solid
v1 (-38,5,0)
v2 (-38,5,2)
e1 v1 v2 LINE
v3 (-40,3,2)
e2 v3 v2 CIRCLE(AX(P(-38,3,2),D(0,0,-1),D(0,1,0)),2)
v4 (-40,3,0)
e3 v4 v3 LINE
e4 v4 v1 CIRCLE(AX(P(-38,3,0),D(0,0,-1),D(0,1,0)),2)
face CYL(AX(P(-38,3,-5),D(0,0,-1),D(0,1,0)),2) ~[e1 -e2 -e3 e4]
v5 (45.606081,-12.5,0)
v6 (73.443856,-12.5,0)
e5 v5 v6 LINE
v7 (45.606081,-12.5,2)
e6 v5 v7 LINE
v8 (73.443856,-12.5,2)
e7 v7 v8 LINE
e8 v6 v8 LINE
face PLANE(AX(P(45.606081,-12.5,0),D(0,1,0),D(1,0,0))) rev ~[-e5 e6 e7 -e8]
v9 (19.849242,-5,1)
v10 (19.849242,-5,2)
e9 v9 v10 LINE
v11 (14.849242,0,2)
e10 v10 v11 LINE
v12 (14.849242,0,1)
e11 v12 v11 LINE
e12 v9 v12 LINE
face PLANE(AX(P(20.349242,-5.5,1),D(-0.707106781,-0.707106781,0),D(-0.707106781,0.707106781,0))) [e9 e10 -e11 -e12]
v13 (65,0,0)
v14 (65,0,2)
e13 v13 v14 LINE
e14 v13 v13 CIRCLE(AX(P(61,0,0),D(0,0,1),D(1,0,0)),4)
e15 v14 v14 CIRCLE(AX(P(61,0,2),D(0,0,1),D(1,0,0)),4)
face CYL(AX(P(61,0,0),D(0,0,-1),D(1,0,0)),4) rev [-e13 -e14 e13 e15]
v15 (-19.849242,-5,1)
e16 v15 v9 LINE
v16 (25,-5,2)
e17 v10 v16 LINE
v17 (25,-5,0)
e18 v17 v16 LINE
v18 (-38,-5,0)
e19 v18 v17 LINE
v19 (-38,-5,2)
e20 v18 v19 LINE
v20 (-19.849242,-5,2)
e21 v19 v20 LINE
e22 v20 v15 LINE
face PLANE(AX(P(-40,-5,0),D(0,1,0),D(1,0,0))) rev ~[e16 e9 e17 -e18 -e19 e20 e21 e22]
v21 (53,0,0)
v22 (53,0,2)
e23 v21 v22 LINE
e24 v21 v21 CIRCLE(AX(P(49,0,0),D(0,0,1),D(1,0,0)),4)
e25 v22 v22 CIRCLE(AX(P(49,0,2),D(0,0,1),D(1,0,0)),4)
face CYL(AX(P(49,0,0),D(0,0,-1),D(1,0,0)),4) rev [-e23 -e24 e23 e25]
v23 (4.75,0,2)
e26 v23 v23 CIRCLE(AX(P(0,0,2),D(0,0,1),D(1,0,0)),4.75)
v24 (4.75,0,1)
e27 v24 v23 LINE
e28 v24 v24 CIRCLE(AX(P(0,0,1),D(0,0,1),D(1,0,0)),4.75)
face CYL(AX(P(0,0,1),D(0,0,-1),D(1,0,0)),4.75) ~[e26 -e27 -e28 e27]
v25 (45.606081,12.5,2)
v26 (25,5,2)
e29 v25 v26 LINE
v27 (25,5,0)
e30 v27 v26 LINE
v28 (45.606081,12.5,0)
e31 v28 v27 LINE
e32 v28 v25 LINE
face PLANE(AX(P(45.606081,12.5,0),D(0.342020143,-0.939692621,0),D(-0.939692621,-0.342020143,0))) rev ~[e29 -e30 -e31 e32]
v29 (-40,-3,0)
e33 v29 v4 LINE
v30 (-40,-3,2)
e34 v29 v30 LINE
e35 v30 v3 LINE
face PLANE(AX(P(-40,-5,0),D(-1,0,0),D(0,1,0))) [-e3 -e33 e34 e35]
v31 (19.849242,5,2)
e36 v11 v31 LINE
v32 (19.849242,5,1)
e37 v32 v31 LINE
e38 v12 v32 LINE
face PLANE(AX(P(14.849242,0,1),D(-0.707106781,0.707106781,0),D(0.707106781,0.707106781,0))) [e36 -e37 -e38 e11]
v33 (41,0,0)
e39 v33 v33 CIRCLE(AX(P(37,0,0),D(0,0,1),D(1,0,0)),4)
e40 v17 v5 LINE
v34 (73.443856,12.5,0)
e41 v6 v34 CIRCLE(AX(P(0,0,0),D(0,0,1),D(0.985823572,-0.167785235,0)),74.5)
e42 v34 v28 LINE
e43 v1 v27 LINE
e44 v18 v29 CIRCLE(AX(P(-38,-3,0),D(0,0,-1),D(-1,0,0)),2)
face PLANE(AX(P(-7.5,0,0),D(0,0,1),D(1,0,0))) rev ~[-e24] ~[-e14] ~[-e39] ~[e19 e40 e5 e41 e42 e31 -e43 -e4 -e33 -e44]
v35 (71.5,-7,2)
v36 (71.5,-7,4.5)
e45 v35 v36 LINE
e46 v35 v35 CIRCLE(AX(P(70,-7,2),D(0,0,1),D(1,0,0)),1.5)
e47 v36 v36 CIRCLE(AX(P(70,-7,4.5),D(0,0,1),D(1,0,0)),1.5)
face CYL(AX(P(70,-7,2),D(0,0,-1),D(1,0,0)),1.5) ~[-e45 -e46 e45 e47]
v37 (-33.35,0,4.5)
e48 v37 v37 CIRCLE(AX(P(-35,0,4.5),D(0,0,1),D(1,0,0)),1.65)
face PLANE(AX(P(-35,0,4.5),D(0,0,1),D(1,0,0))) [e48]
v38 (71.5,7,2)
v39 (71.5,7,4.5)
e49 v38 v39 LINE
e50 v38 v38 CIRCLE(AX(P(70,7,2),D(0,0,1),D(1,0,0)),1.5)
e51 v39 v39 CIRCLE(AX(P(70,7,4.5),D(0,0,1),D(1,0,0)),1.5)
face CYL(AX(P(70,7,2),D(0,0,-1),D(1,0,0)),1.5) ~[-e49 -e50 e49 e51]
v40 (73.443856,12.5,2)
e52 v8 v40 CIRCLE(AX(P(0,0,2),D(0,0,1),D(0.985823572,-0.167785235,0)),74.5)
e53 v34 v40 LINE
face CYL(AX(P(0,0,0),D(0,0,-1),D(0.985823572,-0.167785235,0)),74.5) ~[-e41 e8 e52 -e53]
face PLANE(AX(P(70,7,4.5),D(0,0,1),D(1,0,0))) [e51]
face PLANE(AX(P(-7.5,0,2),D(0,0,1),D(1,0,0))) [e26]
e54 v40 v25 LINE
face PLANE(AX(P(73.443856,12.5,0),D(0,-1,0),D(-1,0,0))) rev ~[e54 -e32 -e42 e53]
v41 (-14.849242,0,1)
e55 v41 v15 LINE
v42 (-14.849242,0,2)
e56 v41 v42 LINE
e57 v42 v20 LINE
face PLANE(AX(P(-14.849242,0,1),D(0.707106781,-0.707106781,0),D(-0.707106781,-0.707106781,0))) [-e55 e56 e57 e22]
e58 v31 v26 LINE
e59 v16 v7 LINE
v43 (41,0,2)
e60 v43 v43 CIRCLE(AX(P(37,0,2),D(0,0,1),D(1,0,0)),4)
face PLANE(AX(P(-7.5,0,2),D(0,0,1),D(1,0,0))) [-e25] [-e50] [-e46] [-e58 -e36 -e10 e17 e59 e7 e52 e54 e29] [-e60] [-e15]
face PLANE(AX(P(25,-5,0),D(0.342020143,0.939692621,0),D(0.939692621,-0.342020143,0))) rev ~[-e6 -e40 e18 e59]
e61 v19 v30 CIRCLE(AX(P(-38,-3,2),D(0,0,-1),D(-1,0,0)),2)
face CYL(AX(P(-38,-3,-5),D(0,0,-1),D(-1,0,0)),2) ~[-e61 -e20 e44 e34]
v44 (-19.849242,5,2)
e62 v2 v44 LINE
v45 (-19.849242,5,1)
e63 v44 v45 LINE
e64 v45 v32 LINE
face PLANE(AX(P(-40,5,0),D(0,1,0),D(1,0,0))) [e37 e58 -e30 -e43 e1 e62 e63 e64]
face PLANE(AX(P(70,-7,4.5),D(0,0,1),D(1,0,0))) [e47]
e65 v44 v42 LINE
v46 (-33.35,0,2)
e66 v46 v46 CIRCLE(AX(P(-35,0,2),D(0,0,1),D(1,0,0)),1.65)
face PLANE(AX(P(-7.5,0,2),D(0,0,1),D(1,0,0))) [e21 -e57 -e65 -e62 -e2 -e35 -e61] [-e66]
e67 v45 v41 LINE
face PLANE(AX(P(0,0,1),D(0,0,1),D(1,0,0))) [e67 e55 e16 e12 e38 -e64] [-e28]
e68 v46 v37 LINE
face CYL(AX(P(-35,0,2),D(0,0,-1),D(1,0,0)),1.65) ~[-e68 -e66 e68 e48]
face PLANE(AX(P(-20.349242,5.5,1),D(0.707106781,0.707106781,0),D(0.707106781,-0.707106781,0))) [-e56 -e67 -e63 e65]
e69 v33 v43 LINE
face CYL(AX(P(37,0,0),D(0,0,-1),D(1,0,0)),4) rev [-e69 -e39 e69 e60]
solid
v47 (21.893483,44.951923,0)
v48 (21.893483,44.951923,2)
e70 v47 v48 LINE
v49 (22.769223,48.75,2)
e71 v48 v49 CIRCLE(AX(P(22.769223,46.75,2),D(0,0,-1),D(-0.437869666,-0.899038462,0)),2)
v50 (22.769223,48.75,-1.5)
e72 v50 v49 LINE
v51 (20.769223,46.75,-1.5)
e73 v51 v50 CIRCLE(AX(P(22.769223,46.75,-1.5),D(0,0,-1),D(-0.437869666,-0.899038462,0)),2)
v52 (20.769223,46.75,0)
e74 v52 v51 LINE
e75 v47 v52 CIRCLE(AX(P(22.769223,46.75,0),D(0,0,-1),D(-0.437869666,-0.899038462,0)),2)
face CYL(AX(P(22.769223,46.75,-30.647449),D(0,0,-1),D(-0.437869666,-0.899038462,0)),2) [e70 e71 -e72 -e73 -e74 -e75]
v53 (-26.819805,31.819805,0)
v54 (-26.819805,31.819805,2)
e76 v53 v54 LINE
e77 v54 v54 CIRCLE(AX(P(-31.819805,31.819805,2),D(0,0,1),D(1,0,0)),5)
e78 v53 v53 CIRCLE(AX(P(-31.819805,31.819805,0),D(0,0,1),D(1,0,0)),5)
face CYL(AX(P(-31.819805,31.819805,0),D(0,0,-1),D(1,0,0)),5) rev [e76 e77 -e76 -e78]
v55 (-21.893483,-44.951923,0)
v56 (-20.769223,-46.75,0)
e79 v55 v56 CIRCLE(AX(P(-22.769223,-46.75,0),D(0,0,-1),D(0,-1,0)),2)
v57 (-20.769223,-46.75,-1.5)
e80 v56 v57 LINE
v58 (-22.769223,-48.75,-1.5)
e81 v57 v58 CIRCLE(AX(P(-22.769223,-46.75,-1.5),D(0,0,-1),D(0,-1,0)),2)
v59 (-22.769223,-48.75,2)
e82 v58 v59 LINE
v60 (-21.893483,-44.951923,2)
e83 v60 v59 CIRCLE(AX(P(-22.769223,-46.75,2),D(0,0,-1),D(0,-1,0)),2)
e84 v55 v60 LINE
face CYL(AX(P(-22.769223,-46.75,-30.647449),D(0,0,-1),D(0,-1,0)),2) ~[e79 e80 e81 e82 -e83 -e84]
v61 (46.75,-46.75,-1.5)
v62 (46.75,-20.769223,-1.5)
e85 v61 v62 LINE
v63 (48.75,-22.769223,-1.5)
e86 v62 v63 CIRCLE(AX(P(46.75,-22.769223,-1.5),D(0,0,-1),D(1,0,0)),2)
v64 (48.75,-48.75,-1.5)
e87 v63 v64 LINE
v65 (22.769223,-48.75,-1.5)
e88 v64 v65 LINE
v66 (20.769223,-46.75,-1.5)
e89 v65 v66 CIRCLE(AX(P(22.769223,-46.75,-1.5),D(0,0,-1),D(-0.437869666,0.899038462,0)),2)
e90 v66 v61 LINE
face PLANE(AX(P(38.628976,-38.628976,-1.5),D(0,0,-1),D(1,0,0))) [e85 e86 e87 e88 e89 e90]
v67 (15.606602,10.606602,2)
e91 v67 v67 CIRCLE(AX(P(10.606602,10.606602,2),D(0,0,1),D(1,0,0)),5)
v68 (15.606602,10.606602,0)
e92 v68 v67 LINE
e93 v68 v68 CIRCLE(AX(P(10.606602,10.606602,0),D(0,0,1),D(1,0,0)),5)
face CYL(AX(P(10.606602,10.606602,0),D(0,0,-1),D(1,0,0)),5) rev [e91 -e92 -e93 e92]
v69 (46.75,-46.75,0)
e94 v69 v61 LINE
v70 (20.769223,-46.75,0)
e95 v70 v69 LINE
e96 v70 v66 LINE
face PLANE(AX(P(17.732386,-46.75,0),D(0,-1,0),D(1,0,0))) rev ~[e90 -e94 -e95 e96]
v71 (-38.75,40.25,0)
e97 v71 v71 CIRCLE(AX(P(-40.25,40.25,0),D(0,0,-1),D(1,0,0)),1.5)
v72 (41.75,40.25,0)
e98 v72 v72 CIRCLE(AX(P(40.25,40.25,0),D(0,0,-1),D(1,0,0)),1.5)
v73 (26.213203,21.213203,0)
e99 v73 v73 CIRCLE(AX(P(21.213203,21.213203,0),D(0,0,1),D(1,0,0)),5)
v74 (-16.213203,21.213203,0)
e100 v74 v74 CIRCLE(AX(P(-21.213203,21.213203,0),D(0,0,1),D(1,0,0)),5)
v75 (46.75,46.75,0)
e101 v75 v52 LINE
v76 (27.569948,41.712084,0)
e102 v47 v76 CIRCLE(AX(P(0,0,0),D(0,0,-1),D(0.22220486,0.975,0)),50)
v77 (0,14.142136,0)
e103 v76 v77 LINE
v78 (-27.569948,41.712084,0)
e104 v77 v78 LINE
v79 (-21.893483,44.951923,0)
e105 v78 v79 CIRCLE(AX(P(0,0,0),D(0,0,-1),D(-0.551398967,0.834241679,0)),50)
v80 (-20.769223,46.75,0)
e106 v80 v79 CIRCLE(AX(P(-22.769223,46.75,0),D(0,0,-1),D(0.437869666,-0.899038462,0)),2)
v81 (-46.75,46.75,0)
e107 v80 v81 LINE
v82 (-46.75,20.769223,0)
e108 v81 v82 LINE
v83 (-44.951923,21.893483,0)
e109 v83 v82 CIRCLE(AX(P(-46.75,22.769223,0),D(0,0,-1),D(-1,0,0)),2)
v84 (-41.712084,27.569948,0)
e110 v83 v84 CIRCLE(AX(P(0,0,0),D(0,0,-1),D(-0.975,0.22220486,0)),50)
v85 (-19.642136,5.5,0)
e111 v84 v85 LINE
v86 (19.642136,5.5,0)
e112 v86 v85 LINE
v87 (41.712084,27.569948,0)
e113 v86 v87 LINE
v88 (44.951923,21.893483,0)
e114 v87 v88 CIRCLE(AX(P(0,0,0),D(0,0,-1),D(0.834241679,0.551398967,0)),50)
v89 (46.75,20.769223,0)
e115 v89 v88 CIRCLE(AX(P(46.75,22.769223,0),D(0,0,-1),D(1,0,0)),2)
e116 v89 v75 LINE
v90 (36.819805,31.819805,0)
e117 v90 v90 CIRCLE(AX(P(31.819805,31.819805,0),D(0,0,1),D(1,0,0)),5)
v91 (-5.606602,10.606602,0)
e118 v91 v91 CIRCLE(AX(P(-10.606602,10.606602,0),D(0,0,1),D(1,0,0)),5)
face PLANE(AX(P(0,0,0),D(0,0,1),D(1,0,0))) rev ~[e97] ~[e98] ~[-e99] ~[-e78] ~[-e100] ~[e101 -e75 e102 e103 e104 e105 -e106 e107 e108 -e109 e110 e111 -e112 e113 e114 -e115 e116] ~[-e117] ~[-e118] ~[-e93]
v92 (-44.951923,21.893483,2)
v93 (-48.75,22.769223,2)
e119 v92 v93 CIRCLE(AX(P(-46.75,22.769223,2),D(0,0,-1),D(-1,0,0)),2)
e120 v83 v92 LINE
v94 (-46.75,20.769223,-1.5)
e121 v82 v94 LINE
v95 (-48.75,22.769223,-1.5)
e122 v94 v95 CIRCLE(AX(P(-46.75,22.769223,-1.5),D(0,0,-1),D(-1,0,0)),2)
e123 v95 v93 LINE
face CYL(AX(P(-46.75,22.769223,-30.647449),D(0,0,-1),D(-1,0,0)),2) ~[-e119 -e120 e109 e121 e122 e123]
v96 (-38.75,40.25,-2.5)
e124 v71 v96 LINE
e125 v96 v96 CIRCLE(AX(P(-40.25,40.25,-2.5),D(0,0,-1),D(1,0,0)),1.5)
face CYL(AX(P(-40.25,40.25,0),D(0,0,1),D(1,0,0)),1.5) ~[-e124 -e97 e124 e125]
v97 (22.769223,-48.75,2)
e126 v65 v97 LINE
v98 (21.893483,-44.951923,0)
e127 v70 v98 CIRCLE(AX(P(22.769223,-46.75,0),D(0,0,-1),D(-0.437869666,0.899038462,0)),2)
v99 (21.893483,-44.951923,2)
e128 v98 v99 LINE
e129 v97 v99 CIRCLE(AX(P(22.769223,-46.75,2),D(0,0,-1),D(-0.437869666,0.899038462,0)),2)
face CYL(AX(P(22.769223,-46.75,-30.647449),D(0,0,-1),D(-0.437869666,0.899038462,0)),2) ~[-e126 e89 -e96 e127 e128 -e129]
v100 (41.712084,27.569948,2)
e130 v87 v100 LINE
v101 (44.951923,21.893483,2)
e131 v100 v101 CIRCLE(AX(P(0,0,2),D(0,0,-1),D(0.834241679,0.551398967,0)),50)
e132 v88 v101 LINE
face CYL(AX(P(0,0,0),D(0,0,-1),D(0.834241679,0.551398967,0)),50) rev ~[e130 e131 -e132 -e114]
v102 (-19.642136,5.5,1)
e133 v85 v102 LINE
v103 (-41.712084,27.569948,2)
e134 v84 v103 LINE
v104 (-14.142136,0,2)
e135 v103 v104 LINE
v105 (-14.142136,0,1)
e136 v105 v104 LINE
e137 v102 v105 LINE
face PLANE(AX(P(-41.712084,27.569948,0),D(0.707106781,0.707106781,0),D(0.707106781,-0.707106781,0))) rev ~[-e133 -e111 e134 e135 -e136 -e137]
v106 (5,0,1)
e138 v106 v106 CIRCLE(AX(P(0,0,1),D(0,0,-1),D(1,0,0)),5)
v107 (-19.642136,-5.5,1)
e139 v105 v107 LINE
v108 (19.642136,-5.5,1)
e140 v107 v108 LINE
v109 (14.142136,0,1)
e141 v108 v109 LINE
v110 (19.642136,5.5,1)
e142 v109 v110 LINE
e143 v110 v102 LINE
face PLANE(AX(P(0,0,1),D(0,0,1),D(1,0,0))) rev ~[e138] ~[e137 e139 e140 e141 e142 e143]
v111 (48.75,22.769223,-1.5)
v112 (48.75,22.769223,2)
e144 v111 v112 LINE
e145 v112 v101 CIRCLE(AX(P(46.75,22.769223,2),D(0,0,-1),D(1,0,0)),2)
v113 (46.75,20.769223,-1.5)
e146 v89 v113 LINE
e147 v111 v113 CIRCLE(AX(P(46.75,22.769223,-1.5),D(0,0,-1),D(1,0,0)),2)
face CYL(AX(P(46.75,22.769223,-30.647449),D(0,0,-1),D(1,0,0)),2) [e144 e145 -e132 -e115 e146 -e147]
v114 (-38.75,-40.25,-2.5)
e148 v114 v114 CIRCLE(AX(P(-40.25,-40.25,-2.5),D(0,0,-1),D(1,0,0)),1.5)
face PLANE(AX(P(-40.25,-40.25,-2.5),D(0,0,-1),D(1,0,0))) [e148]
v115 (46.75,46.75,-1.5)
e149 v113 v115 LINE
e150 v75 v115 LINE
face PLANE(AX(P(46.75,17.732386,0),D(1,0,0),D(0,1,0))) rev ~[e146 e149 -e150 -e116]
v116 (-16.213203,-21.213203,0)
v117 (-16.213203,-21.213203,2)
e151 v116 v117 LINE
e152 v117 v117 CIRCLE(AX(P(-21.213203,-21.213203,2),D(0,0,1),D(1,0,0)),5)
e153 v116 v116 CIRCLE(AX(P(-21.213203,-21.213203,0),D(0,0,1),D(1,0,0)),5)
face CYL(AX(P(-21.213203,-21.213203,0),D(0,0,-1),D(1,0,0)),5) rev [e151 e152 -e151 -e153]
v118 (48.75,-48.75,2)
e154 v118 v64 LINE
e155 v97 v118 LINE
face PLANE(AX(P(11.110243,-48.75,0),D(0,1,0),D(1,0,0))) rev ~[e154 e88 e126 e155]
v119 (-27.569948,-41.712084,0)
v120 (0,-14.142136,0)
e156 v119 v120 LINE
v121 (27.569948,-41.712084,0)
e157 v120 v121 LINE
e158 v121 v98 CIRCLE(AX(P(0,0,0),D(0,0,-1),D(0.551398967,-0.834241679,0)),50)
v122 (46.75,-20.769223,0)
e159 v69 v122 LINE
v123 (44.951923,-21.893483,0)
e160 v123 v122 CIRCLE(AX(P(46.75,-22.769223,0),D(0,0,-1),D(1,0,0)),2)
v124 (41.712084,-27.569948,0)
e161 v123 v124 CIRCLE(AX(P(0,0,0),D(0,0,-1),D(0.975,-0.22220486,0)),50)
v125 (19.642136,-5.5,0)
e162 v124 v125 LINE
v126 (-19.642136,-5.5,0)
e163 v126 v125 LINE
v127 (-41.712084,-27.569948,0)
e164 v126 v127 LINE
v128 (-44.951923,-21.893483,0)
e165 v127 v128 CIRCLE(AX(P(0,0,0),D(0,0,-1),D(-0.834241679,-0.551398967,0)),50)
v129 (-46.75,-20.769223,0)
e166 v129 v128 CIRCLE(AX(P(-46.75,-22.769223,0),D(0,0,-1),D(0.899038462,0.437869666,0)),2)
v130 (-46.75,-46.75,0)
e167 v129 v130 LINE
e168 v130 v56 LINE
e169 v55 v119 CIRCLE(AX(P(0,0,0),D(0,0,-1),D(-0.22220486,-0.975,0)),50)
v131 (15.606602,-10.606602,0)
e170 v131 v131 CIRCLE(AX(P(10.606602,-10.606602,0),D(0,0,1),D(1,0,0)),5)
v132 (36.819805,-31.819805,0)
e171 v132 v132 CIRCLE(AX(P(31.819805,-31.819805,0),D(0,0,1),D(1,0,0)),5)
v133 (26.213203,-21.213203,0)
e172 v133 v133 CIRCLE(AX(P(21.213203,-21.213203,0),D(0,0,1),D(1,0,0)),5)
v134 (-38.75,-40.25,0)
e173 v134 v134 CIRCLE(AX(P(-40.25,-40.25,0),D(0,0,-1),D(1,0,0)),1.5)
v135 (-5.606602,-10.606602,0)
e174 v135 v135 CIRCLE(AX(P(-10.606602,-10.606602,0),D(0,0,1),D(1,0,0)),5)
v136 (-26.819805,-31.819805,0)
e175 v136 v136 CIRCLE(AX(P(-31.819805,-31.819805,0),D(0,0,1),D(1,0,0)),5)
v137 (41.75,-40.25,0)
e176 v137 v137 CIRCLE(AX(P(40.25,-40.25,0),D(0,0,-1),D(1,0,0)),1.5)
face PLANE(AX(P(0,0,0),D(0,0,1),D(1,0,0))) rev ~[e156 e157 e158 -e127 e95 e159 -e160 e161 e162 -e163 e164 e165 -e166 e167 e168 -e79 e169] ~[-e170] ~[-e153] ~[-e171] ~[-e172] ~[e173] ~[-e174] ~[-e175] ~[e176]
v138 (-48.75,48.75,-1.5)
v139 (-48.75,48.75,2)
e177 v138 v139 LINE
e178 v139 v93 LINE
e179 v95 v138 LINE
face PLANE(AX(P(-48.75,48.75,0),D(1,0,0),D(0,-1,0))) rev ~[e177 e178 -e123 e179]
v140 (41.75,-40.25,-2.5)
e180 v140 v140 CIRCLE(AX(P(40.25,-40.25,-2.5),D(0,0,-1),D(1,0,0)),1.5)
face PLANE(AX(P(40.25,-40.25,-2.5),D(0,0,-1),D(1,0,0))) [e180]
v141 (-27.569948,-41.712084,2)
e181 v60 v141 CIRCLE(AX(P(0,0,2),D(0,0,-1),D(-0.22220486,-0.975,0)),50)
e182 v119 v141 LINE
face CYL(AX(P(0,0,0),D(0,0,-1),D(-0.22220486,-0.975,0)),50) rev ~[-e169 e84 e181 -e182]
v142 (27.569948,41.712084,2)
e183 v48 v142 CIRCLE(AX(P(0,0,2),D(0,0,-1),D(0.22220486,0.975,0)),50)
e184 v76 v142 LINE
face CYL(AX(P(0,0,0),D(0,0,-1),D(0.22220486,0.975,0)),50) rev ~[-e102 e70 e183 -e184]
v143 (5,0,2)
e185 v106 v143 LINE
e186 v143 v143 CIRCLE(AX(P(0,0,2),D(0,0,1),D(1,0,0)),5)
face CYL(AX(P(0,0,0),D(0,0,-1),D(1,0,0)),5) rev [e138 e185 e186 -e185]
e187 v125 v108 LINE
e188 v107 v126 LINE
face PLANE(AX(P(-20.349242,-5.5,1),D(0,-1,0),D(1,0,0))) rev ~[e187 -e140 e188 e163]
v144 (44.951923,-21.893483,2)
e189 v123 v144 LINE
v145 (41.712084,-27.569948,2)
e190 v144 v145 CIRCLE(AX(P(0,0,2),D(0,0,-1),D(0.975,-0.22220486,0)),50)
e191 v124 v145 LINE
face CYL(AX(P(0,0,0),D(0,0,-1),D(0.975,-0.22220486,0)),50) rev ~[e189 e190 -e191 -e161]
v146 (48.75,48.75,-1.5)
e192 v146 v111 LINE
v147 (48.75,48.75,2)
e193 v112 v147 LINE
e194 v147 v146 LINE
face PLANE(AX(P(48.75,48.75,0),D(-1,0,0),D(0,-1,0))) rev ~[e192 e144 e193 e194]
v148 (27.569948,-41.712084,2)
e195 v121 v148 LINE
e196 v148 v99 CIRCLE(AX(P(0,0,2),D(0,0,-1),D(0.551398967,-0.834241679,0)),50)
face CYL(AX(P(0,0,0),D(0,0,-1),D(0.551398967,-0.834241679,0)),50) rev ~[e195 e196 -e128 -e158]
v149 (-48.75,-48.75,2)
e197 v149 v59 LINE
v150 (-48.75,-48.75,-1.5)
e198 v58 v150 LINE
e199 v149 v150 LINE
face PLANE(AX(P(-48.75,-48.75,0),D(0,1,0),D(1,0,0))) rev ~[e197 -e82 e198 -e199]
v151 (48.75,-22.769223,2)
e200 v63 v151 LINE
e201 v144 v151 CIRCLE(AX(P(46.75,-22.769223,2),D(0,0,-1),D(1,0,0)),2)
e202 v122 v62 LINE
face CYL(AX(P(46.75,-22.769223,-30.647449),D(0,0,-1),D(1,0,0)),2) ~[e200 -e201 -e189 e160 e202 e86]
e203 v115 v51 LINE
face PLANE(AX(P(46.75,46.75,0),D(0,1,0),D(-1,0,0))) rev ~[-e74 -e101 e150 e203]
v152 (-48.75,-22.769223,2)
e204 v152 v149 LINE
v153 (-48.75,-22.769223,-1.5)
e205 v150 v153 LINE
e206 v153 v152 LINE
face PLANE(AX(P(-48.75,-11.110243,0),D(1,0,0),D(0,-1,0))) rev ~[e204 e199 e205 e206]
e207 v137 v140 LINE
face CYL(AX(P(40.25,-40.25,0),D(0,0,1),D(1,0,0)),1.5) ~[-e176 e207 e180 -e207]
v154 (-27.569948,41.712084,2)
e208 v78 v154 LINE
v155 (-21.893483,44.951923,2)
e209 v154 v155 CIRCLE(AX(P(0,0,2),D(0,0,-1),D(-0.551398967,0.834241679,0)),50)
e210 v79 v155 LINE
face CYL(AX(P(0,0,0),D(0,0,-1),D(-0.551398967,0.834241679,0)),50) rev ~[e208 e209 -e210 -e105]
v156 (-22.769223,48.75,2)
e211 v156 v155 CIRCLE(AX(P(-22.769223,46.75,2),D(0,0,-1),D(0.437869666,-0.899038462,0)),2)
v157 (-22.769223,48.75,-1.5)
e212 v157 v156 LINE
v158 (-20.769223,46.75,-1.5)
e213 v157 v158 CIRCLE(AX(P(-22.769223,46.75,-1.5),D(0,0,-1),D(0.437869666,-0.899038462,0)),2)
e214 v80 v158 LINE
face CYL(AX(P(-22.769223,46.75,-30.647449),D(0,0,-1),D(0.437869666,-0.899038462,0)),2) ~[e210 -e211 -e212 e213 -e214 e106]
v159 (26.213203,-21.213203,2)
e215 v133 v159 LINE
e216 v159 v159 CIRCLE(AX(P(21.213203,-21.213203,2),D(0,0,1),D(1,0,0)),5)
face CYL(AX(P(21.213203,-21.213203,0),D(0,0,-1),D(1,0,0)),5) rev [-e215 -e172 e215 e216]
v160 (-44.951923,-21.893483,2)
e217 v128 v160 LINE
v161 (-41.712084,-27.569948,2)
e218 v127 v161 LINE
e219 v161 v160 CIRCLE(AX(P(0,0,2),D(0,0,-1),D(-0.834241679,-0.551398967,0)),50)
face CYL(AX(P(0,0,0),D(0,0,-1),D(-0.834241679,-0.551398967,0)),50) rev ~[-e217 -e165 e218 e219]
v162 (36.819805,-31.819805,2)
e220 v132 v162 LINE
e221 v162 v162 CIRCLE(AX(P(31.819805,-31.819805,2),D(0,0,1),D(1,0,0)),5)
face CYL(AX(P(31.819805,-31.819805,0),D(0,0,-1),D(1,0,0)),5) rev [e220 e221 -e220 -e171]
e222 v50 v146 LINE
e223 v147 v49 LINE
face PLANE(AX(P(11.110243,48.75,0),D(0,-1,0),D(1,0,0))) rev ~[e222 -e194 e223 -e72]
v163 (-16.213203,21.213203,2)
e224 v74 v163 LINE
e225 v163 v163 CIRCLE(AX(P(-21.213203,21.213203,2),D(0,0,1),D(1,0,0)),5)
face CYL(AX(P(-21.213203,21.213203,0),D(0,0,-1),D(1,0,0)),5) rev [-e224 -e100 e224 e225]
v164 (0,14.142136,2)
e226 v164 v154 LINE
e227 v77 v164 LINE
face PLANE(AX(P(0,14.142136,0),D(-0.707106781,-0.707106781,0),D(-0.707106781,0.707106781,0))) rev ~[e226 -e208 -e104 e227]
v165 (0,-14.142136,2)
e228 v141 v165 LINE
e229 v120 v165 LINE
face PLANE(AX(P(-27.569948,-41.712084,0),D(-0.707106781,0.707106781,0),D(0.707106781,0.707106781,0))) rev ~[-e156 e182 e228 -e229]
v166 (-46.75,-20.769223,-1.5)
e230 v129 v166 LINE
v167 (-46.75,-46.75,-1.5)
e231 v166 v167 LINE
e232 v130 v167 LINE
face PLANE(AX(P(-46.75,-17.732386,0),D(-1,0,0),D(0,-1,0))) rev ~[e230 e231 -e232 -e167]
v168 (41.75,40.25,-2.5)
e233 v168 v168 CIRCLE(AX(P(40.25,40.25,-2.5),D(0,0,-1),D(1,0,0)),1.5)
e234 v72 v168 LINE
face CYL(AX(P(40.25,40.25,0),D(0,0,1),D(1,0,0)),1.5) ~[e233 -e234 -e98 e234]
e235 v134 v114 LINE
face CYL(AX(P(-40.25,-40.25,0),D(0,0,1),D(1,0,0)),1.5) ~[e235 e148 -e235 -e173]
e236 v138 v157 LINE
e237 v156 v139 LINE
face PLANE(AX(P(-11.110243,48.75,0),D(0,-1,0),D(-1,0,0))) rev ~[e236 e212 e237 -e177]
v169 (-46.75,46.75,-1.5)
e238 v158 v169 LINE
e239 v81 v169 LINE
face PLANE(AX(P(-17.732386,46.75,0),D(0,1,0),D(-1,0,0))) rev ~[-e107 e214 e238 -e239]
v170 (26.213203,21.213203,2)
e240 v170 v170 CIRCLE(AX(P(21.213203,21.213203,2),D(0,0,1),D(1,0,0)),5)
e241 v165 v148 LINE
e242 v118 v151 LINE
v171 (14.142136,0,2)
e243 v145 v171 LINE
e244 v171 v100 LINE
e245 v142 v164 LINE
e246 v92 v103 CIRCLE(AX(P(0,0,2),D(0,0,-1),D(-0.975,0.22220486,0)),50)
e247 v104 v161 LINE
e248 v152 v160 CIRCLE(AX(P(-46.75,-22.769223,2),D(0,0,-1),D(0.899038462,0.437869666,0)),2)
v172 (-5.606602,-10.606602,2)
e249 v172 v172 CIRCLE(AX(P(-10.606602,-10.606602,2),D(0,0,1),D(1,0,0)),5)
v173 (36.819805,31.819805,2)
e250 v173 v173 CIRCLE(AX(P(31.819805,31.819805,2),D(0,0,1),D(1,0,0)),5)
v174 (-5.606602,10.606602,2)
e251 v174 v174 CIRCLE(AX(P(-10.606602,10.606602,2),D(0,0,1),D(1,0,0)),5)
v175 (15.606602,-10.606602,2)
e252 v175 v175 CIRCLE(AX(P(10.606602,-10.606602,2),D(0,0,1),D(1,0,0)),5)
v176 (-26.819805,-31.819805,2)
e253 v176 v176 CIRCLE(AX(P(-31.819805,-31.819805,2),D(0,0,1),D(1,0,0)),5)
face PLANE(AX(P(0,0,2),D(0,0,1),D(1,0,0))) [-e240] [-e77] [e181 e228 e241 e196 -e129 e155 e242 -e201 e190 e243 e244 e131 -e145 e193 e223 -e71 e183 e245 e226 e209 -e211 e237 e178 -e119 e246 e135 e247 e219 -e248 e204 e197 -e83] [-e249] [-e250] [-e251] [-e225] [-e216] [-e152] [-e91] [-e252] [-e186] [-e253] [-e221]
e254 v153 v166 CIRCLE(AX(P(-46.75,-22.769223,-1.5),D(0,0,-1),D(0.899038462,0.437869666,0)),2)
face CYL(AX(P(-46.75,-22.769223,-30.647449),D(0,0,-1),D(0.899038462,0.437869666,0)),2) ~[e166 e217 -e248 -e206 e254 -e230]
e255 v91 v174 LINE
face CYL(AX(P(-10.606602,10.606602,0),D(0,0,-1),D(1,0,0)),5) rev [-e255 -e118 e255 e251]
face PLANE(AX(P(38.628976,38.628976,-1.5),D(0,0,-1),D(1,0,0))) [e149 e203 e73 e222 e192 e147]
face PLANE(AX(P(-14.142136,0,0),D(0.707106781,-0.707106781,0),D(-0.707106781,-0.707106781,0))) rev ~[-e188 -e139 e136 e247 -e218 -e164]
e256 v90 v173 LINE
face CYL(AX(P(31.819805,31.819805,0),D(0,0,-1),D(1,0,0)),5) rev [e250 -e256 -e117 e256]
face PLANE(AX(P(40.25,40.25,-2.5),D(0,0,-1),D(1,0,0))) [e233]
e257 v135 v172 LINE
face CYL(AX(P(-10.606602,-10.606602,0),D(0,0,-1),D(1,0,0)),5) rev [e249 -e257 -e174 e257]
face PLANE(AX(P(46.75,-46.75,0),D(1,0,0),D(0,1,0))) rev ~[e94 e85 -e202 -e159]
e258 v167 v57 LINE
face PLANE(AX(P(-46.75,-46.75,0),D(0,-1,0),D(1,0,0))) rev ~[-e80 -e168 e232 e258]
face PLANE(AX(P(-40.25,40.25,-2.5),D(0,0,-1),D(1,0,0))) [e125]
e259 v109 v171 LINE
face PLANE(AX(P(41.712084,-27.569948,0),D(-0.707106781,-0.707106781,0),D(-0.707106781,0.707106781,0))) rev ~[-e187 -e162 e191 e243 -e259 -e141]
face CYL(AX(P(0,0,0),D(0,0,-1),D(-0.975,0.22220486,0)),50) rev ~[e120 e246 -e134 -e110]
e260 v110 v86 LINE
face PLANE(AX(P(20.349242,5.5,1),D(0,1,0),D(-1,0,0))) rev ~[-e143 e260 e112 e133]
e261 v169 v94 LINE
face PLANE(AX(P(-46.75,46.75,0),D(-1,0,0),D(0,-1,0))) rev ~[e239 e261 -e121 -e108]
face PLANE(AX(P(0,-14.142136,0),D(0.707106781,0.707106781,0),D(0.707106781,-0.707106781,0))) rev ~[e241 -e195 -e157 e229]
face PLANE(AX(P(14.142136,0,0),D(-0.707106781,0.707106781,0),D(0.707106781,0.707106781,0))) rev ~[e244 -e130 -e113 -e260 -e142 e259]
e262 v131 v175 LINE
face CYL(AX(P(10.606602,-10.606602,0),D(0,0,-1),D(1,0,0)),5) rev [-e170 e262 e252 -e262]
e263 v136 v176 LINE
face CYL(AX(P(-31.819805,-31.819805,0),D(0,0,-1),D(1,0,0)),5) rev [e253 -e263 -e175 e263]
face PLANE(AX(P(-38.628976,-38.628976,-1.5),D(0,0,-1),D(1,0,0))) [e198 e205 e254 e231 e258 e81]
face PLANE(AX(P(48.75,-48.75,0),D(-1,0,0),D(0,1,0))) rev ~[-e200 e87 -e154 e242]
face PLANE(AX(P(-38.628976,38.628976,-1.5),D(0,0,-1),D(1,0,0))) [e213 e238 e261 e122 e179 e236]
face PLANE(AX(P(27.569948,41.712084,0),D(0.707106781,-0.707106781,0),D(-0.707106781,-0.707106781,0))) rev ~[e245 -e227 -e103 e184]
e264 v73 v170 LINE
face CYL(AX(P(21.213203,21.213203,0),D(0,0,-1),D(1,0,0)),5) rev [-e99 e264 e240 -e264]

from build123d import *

# Parameters (mm, degrees)
F0_R           = 5
F1_DEPTH       = 2
F3_DEPTH       = 1.5
F4_R           = 1.5
F5_DEPTH       = 2.5
F7_W           = 65
F7_H           = 10
F7_R           = 4
F8_DEPTH       = 2
F9_R           = 1.65
F9_R_2         = 1.5
F10_DEPTH      = 2.5
F11_R          = 4.75
F12_DEPTH      = 1
F13_DEPTH      = 1
F14_T1_DEPTH   = 61.7948981324
F14_2_T1_DEPTH = 12


# Not quite as in the source:
# - a fillet or chamfer that OpenCascade refuses, or shapes differently, is made with other operations: its cross-section is extruded or revolved along the edge and cut away or added


with BuildPart() as f1:
    # F0 (on Top) → F1 (new body)
    with BuildSketch(Plane.XY):
        with BuildLine():
            Line((-11.1102430216, 48.75), (-48.75, 48.75))
            Line((-48.75, 48.75), (-48.75, 11.1102430216))
            ThreePointArc((-48.75, 11.1102430216), (-45.9736623898, 19.6576287092), (-41.7120839632, 27.5699483395))
            Line((-41.7120839632, 27.5699483395), (-14.1421356237, 0))
            Line((-14.1421356237, 0), (-41.7120839632, -27.5699483395))
            ThreePointArc((-41.7120839632, -27.5699483395), (-45.9736623898, -19.6576287092), (-48.75, -11.1102430216))
            Line((-48.75, -11.1102430216), (-48.75, -48.75))
            Line((-48.75, -48.75), (-11.1102430216, -48.75))
            ThreePointArc((-11.1102430216, -48.75), (-19.6576287092, -45.9736623898), (-27.5699483395, -41.7120839632))
            Line((-27.5699483395, -41.7120839632), (0, -14.1421356237))
            Line((0, -14.1421356237), (27.5699483395, -41.7120839632))
            ThreePointArc((27.5699483395, -41.7120839632), (19.6576287092, -45.9736623898), (11.1102430216, -48.75))
            Line((11.1102430216, -48.75), (48.75, -48.75))
            Line((48.75, -48.75), (48.75, -11.1102430216))
            ThreePointArc((48.75, -11.1102430216), (45.9736623898, -19.6576287092), (41.7120839632, -27.5699483395))
            Line((41.7120839632, -27.5699483395), (14.1421356237, 0))
            Line((14.1421356237, 0), (41.7120839632, 27.5699483395))
            ThreePointArc((41.7120839632, 27.5699483395), (45.9736623898, 19.6576287092), (48.75, 11.1102430216))
            Line((48.75, 11.1102430216), (48.75, 48.75))
            Line((48.75, 48.75), (11.1102430216, 48.75))
            ThreePointArc((11.1102430216, 48.75), (19.6576287092, 45.9736623898), (27.5699483395, 41.7120839632))
            Line((27.5699483395, 41.7120839632), (0, 14.1421356237))
            Line((0, 14.1421356237), (-27.5699483395, 41.7120839632))
            ThreePointArc((-27.5699483395, 41.7120839632), (-19.6576287092, 45.9736623898), (-11.1102430216, 48.75))
        make_face()
        with Locations((-31.8198051534, -31.8198051534)):
            Circle(F0_R, mode=Mode.SUBTRACT)
        with Locations((-21.2132034356, -21.2132034356)):
            Circle(F0_R, mode=Mode.SUBTRACT)
        with Locations((-10.6066017178, -10.6066017178)):
            Circle(F0_R, mode=Mode.SUBTRACT)
        with Locations((31.8198051534, -31.8198051534)):
            Circle(F0_R, mode=Mode.SUBTRACT)
        with Locations((21.2132034356, -21.2132034356)):
            Circle(F0_R, mode=Mode.SUBTRACT)
        with Locations((10.6066017178, -10.6066017178)):
            Circle(F0_R, mode=Mode.SUBTRACT)
        Circle(F0_R, mode=Mode.SUBTRACT)
        with Locations((-10.6066017178, 10.6066017178)):
            Circle(F0_R, mode=Mode.SUBTRACT)
        with Locations((-21.2132034356, 21.2132034356)):
            Circle(F0_R, mode=Mode.SUBTRACT)
        with Locations((-31.8198051534, 31.8198051534)):
            Circle(F0_R, mode=Mode.SUBTRACT)
        with Locations((10.6066017178, 10.6066017178)):
            Circle(F0_R, mode=Mode.SUBTRACT)
        with Locations((21.2132034356, 21.2132034356)):
            Circle(F0_R, mode=Mode.SUBTRACT)
        with Locations((31.8198051534, 31.8198051534)):
            Circle(F0_R, mode=Mode.SUBTRACT)
    extrude(amount=F1_DEPTH)

    # F2 (on face) → F3 (join)
    with BuildSketch(Plane(origin=(0, 0, 0), x_dir=(1, 0, 0), z_dir=(0, 0, -1))):
        with BuildLine():
            Line((46.75, -46.75), (17.7323856263, -46.75))
            ThreePointArc((17.7323856263, -46.75), (14.4559436507, -47.8646601698), (11.1102430216, -48.75))
            Line((11.1102430216, -48.75), (48.75, -48.75))
            Line((48.75, -48.75), (48.75, -11.1102430216))
            ThreePointArc((48.75, -11.1102430216), (47.8646601698, -14.4559436507), (46.75, -17.7323856263))
            Line((46.75, -17.7323856263), (46.75, -46.75))
        make_face()
        with BuildLine():
            ThreePointArc((11.1102430216, 48.75), (14.4559436507, 47.8646601698), (17.7323856263, 46.75))
            Line((17.7323856263, 46.75), (46.75, 46.75))
            Line((46.75, 46.75), (46.75, 17.7323856263))
            ThreePointArc((46.75, 17.7323856263), (47.8646601698, 14.4559436507), (48.75, 11.1102430216))
            Line((48.75, 11.1102430216), (48.75, 48.75))
            Line((48.75, 48.75), (11.1102430216, 48.75))
        make_face()
        with BuildLine():
            Line((-17.7323856263, -46.75), (-46.75, -46.75))
            Line((-46.75, -46.75), (-46.75, -17.7323856263))
            ThreePointArc((-46.75, -17.7323856263), (-47.8646601698, -14.4559436507), (-48.75, -11.1102430216))
            Line((-48.75, -11.1102430216), (-48.75, -48.75))
            Line((-48.75, -48.75), (-11.1102430216, -48.75))
            ThreePointArc((-11.1102430216, -48.75), (-14.4559436507, -47.8646601698), (-17.7323856263, -46.75))
        make_face()
        with BuildLine():
            Line((-11.1102430216, 48.75), (-48.75, 48.75))
            Line((-48.75, 48.75), (-48.75, 11.1102430216))
            ThreePointArc((-48.75, 11.1102430216), (-47.8646601698, 14.4559436507), (-46.75, 17.7323856263))
            Line((-46.75, 17.7323856263), (-46.75, 46.75))
            Line((-46.75, 46.75), (-17.7323856263, 46.75))
            ThreePointArc((-17.7323856263, 46.75), (-14.4559436507, 47.8646601698), (-11.1102430216, 48.75))
        make_face()
    extrude(amount=F3_DEPTH)

    # F4 (on face) → F5 (join)
    with BuildSketch(Plane(origin=(0, 0, 0), x_dir=(1, 0, 0), z_dir=(0, 0, -1))):
        with Locations((-40.25, 40.25)):
            Circle(F4_R)
        with Locations((40.25, 40.25)):
            Circle(F4_R)
        with Locations((40.25, -40.25)):
            Circle(F4_R)
        with Locations((-40.25, -40.25)):
            Circle(F4_R)
    extrude(amount=F5_DEPTH)

    # F11 (on offset) → F13 (cut)
    with BuildSketch(Plane.XY.offset(1)):
        Polygon((20.3492424049, -5.5), (14.8492424049, 0), (20.3492424049, 5.5), (-20.3492424049, 5.5), (-14.8492424049, 0), (-20.3492424049, -5.5), align=None)
        Circle(F11_R, mode=Mode.SUBTRACT)
    extrude(amount=-F13_DEPTH, mode=Mode.SUBTRACT)

    # F14: fillet of radius 2 on 8 edges, made by hand

    # F14_s2 → F14_t1 (cut)
    with BuildSketch(Plane.XY.offset(-30.6474490662)):
        with BuildLine():
            ThreePointArc((-48.75, 22.7692226481), (-47.1993585171, 20.8203571004), (-44.9519230769, 21.8934833155))
            ThreePointArc((-44.9519230769, 21.8934833155), (-47.160175624, 16.6107746693), (-48.75, 11.1102430216))
            Line((-48.75, 11.1102430216), (-48.75, 22.7692226481))
        make_face()
        with BuildLine():
            ThreePointArc((-21.8934833155, 44.9519230769), (-20.8203571004, 47.1993585171), (-22.7692226481, 48.75))
            Line((-22.7692226481, 48.75), (-11.1102430216, 48.75))
            ThreePointArc((-11.1102430216, 48.75), (-16.6107746693, 47.160175624), (-21.8934833155, 44.9519230769))
        make_face()
        with BuildLine():
            ThreePointArc((21.8934833155, 44.9519230769), (20.8203571004, 47.1993585171), (22.7692226481, 48.75))
            Line((22.7692226481, 48.75), (11.1102430216, 48.75))
            ThreePointArc((11.1102430216, 48.75), (16.6107746693, 47.160175624), (21.8934833155, 44.9519230769))
        make_face()
        with BuildLine():
            ThreePointArc((48.75, 22.7692226481), (47.1993585171, 20.8203571004), (44.9519230769, 21.8934833155))
            ThreePointArc((44.9519230769, 21.8934833155), (47.160175624, 16.6107746693), (48.75, 11.1102430216))
            Line((48.75, 11.1102430216), (48.75, 22.7692226481))
        make_face()
        with BuildLine():
            ThreePointArc((48.75, -22.7692226481), (47.1993585171, -20.8203571004), (44.9519230769, -21.8934833155))
            ThreePointArc((44.9519230769, -21.8934833155), (47.160175624, -16.6107746693), (48.75, -11.1102430216))
            Line((48.75, -11.1102430216), (48.75, -22.7692226481))
        make_face()
        with BuildLine():
            ThreePointArc((-44.9519230769, -21.8934833155), (-47.1993585171, -20.8203571004), (-48.75, -22.7692226481))
            Line((-48.75, -22.7692226481), (-48.75, -11.1102430216))
            ThreePointArc((-48.75, -11.1102430216), (-47.160175624, -16.6107746693), (-44.9519230769, -21.8934833155))
        make_face()
        with BuildLine():
            ThreePointArc((-22.7692226481, -48.75), (-20.8203571004, -47.1993585171), (-21.8934833155, -44.9519230769))
            ThreePointArc((-21.8934833155, -44.9519230769), (-16.6107746693, -47.160175624), (-11.1102430216, -48.75))
            Line((-11.1102430216, -48.75), (-22.7692226481, -48.75))
        make_face()
        with BuildLine():
            ThreePointArc((21.8934833155, -44.9519230769), (20.8203571004, -47.1993585171), (22.7692226481, -48.75))
            Line((22.7692226481, -48.75), (11.1102430216, -48.75))
            ThreePointArc((11.1102430216, -48.75), (16.6107746693, -47.160175624), (21.8934833155, -44.9519230769))
        make_face()
    extrude(amount=F14_T1_DEPTH, mode=Mode.SUBTRACT)


with BuildPart() as f8:
    # F7 (on Top) → F8 (new body)
    with BuildSketch(Plane.XY):
        with Locations((-7.5, 0)):
            Rectangle(F7_W, F7_H)
        with BuildLine():
            Line((45.6060806459, 12.5), (25, 5))
            Line((25, 5), (25, -5))
            Line((25, -5), (45.6060806459, -12.5))
            Line((45.6060806459, -12.5), (73.4438561079, -12.5))
            ThreePointArc((73.4438561079, -12.5), (74.5, 0), (73.4438561079, 12.5))
            Line((73.4438561079, 12.5), (45.6060806459, 12.5))
        make_face()
        with Locations((37, 0)):
            Circle(F7_R, mode=Mode.SUBTRACT)
        with Locations((49, 0)):
            Circle(F7_R, mode=Mode.SUBTRACT)
        with Locations((61, 0)):
            Circle(F7_R, mode=Mode.SUBTRACT)
    extrude(amount=F8_DEPTH)

    # F9 (on face) → F10 (join)
    with BuildSketch(Plane.XY.offset(2)):
        with Locations((-35, 0)):
            Circle(F9_R)
        with Locations((70, 7)):
            Circle(F9_R_2)
        with Locations((70, -7)):
            Circle(F9_R_2)
    extrude(amount=F10_DEPTH)

    # F11 (on offset) → F12 (cut)
    with BuildSketch(Plane.XY.offset(1)):
        Polygon((20.3492424049, -5.5), (14.8492424049, 0), (20.3492424049, 5.5), (-20.3492424049, 5.5), (-14.8492424049, 0), (-20.3492424049, -5.5), align=None)
        Circle(F11_R, mode=Mode.SUBTRACT)
    extrude(amount=F12_DEPTH, mode=Mode.SUBTRACT)

    # F14#2: fillet of radius 2 on 2 edges, made by hand

    # F14_2_s2 → F14_2_t1 (cut)
    with BuildSketch(Plane.XY.offset(-5)):
        with BuildLine():
            ThreePointArc((-38, 5), (-39.4142135624, 4.4142135624), (-40, 3))
            Line((-40, 3), (-40, 5))
            Line((-40, 5), (-38, 5))
        make_face()
        with BuildLine():
            ThreePointArc((-40, -3), (-39.4142135624, -4.4142135624), (-38, -5))
            Line((-38, -5), (-40, -5))
            Line((-40, -5), (-40, -3))
        make_face()
    extrude(amount=F14_2_T1_DEPTH, mode=Mode.SUBTRACT)


solid = Compound([f1.part, f8.part])
